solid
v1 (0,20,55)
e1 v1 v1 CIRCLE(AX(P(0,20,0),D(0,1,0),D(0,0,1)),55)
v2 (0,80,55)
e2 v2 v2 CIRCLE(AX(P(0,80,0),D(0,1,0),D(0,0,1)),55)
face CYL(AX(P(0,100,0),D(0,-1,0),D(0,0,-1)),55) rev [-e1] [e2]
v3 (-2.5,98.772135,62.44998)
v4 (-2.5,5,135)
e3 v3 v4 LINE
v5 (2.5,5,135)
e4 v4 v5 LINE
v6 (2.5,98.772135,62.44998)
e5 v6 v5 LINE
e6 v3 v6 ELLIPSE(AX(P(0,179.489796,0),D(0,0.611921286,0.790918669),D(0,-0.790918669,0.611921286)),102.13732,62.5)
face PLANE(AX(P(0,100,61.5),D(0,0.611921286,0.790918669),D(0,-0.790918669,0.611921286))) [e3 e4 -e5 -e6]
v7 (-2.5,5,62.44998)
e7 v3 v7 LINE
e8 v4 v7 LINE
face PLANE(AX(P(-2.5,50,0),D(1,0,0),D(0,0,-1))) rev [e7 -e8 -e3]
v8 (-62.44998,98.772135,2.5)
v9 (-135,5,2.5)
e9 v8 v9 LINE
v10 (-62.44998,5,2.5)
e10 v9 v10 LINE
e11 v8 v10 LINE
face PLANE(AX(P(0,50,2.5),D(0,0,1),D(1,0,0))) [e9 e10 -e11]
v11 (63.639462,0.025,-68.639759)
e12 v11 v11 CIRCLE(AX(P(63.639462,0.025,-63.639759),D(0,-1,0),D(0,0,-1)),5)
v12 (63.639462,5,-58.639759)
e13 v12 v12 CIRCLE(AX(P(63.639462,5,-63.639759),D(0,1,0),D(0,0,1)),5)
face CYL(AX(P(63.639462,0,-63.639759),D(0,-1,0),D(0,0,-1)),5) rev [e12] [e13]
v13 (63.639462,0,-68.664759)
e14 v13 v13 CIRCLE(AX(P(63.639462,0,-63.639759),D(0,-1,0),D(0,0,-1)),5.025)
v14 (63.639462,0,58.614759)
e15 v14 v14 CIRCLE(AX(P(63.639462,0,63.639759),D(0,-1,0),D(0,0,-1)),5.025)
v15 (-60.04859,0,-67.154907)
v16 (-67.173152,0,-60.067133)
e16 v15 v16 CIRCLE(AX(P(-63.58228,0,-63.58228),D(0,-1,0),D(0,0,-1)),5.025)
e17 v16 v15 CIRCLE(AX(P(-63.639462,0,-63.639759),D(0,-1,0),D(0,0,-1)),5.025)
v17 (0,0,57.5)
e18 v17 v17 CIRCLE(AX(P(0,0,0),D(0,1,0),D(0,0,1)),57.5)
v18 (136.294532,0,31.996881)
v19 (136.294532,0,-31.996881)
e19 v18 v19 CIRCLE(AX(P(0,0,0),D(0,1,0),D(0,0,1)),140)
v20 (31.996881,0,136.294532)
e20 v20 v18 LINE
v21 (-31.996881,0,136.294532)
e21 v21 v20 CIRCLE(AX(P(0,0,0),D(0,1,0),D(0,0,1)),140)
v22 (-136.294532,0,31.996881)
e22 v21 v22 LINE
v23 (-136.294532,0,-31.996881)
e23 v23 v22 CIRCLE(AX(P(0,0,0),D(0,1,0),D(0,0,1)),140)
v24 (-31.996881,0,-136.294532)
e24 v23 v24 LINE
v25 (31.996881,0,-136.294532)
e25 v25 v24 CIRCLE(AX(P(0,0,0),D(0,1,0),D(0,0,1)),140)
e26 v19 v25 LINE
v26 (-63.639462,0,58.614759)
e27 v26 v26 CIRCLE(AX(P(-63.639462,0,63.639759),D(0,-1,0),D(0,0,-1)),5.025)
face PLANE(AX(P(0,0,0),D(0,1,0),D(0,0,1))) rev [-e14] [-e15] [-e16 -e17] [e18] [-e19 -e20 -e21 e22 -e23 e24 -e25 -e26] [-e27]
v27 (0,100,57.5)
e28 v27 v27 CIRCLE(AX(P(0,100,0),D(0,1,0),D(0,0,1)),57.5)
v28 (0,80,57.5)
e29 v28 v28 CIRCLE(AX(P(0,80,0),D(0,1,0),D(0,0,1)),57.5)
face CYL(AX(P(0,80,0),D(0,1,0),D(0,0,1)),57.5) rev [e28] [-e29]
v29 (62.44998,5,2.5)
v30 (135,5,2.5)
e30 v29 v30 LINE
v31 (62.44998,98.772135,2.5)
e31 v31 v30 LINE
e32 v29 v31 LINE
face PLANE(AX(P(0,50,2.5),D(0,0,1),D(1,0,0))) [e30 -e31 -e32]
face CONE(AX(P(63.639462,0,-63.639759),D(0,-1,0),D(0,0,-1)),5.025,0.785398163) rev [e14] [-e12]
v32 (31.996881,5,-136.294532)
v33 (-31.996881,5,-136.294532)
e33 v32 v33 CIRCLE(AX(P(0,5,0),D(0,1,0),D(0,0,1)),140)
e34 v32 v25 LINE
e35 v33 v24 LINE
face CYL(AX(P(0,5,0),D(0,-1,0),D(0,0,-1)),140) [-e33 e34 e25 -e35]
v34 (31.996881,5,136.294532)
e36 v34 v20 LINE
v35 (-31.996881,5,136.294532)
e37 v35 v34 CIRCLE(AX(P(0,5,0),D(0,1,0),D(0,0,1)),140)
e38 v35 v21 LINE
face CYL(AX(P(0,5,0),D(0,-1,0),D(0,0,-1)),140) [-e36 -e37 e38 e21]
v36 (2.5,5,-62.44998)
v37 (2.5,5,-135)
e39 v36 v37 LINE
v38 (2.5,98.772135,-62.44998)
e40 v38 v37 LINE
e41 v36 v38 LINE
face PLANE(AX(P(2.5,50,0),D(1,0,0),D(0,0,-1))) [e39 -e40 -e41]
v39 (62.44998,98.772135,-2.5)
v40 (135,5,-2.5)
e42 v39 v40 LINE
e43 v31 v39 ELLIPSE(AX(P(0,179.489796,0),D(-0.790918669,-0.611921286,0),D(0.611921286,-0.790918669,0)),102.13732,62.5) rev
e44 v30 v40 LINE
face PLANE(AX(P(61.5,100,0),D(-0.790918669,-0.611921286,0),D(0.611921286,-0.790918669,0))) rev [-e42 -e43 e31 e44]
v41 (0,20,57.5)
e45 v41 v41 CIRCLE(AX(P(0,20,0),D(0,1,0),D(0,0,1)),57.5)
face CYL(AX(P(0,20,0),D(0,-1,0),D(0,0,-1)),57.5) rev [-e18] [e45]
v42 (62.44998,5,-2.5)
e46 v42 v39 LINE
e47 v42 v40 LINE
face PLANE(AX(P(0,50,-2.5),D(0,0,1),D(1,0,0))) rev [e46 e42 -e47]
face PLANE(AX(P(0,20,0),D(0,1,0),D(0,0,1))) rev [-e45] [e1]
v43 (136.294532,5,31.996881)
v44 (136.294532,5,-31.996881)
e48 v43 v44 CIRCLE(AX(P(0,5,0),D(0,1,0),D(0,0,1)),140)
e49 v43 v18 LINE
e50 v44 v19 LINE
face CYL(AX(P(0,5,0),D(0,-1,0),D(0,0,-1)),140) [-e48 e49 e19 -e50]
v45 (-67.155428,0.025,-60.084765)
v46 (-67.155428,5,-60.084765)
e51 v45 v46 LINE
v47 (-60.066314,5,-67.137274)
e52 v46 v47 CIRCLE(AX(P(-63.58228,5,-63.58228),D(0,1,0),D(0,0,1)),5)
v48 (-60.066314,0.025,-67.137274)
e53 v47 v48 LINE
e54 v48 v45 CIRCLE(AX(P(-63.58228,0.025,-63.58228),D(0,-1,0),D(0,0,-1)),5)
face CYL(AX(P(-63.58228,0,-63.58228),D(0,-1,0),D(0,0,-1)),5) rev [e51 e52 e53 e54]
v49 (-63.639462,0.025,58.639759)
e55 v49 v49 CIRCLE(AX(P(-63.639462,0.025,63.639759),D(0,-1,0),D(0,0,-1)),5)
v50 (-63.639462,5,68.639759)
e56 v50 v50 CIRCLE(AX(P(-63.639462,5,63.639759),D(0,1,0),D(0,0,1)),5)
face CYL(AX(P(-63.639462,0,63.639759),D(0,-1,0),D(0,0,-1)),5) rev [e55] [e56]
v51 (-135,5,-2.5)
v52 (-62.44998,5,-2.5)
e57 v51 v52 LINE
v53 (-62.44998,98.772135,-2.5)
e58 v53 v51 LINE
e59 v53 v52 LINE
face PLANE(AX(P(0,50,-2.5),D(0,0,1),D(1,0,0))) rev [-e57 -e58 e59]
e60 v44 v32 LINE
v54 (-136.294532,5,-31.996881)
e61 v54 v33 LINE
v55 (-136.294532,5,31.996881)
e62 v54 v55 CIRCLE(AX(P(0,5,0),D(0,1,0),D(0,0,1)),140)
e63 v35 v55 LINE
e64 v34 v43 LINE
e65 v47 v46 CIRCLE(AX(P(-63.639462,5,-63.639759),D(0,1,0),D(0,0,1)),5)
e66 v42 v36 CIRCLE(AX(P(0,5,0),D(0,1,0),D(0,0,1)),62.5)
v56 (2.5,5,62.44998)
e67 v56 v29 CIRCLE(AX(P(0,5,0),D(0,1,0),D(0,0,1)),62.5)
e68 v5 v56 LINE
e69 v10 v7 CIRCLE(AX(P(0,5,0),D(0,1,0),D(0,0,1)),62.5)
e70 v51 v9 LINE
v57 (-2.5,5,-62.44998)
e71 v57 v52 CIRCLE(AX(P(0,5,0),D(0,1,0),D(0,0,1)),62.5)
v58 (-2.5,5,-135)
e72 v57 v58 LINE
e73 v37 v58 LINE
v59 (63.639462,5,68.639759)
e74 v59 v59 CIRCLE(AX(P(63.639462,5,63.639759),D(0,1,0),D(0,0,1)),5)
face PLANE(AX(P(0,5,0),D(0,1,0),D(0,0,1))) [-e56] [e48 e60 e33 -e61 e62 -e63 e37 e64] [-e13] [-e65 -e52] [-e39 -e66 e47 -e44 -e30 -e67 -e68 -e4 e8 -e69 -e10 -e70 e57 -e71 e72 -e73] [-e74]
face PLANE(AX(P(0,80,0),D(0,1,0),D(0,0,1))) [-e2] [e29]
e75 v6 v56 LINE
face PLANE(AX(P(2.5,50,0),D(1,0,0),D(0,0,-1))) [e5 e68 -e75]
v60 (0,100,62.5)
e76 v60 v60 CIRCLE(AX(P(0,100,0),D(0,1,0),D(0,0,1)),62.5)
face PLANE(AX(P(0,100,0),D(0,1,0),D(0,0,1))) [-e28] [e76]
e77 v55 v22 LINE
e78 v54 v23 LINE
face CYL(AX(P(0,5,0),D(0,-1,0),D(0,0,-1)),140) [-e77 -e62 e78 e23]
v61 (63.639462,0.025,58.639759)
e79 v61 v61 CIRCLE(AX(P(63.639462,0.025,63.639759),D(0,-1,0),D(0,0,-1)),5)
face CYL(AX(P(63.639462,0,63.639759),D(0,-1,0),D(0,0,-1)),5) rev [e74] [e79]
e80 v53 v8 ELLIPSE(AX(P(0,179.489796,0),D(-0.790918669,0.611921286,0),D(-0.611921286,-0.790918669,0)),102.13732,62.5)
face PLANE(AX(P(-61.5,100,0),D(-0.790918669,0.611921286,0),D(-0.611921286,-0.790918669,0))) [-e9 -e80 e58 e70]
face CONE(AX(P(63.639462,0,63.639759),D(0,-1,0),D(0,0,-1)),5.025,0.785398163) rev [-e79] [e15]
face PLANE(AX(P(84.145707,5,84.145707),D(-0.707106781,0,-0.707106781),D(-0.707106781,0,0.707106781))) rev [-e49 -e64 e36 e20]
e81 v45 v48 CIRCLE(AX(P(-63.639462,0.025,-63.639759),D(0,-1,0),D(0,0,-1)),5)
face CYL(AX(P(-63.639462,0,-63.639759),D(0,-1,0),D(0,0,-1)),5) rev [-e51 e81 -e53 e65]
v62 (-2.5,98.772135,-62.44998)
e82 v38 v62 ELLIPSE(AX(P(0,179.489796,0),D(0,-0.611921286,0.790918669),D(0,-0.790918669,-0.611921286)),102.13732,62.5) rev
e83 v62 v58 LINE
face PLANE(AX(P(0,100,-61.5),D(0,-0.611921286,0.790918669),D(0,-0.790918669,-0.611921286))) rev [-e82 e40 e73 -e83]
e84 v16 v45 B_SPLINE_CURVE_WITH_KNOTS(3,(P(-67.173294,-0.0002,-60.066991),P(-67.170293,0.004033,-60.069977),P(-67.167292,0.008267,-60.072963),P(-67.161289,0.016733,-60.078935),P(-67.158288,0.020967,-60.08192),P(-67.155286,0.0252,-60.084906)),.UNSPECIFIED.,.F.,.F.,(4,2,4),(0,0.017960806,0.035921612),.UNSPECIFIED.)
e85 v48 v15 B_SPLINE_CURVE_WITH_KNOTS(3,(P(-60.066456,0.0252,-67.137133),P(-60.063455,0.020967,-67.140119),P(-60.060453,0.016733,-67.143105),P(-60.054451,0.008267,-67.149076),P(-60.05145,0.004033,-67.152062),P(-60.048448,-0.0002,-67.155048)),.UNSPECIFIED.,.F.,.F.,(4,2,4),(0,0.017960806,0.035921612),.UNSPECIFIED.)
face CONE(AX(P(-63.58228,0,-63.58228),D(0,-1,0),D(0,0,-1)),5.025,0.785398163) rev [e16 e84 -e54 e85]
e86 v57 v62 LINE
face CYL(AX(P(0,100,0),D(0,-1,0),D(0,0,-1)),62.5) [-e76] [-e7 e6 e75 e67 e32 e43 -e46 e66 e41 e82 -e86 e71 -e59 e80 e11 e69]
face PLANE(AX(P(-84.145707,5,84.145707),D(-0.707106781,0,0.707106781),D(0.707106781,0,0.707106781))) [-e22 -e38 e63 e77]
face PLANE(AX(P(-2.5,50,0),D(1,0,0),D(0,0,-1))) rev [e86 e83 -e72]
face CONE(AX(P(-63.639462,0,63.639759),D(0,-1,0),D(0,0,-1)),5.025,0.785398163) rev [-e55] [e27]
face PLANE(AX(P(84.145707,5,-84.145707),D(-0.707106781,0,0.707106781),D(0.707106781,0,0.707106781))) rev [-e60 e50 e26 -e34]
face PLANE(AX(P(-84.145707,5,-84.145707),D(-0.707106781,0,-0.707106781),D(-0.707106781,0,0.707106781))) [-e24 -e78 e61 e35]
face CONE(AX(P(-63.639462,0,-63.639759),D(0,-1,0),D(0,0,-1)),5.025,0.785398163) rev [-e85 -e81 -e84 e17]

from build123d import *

# Parameters (mm, degrees)
SKETCH1_R                        = 140
SKETCH1_R_2                      = 62.5
BOSS_EXTRUDE1_DEPTH              = 5
SKETCH1_3_R                      = 62.5
SKETCH1_3_R_2                    = 57.5
SKETCH1_3_R_3                    = 55
BOSS_EXTRUDE2_DEPTH              = 100
SKETCH1_4_R                      = 57.5
SKETCH1_4_R_2                    = 55
CUT_EXTRUDE1_DEPTH               = 20
CUT_EXTRUDE2_START               = -20
SKETCH2_R                        = 57.5
CUT_EXTRUDE2_DEPTH               = 20
F_10_0MM_DOWEL_HOLE1_D           = 10
F_10_0MM_DOWEL_HOLE1_CSINK_D     = 10.05
F_10_0MM_DOWEL_HOLE1_CSINK_ANGLE = 90
CUT_EXTRUDE3_DEPTH               = 5
RIB4_START                       = -2.5
RIB4_DEPTH                       = 5
RIB5_REACH                       = 223.811
SKETCH9_WALL_W                   = 565.734948258
SKETCH9_WALL_H                   = 5
RIB6_REACH                       = 223.811
SKETCH10_WALL_W                  = 565.734948258
SKETCH10_WALL_H                  = 5
RIB7_REACH                       = 223.811
SKETCH11_WALL_W                  = 565.734948258
SKETCH11_WALL_H                  = 5


# Read off the part's stored shape, not the designer's step: Rib4
with BuildPart() as part:
    # Sketch1 → Boss-Extrude1 (new body)
    with BuildSketch(Plane(origin=(0, 0, 0), x_dir=(1, 0, 0), z_dir=(0, 1, 0))):
        with Locations(Location((0, 0, 0), (0, 0, 270))):
            Circle(SKETCH1_R)
        with Locations(Location((0, 0, 0), (0, 0, 270))):
            Circle(SKETCH1_R_2, mode=Mode.SUBTRACT)
    extrude(amount=BOSS_EXTRUDE1_DEPTH)

    # Sketch1<3> → Boss-Extrude2 (add)
    # profile 1 of 2: a face of its own
    with BuildSketch(Plane(origin=(0, 0, 0), x_dir=(1, 0, 0), z_dir=(0, 1, 0))):
        with Locations(Location((0, 0, 0), (0, 0, 270))):
            Circle(SKETCH1_3_R)
        Circle(SKETCH1_3_R_2, mode=Mode.SUBTRACT)
    # profile 2 of 2: a face of its own
    with BuildSketch(Plane(origin=(0, 0, 0), x_dir=(1, 0, 0), z_dir=(0, 1, 0))):
        Circle(SKETCH1_3_R_2)
        with Locations(Location((0, 0, 0), (0, 0, 270))):
            Circle(SKETCH1_3_R_3, mode=Mode.SUBTRACT)
    extrude(amount=BOSS_EXTRUDE2_DEPTH)

    # Sketch1<4> → Cut-Extrude1 (cut)
    with BuildSketch(Plane(origin=(0, 0, 0), x_dir=(1, 0, 0), z_dir=(0, 1, 0))):
        with Locations(Location((0, 0, 0), (0, 0, 270))):
            Circle(SKETCH1_4_R)
        with Locations(Location((0, 0, 0), (0, 0, 270))):
            Circle(SKETCH1_4_R_2, mode=Mode.SUBTRACT)
    extrude(amount=CUT_EXTRUDE1_DEPTH, mode=Mode.SUBTRACT)

    # Sketch2 → Cut-Extrude2 (cut)
    with BuildSketch(Plane(origin=(0, 100, 0), x_dir=(1, 0, 0), z_dir=(0, 1, 0)).offset(CUT_EXTRUDE2_START)):
        with Locations(Location((0, 0, 0), (0, 0, 270))):
            Circle(SKETCH2_R)
    extrude(amount=CUT_EXTRUDE2_DEPTH, mode=Mode.SUBTRACT)

    # Ø10.0mm Dowel Hole1 (through all)
    with Locations(Plane.XZ):
        with Locations((-63.639461911, -63.639758703), (63.639461911, -63.639758703), (63.639461911, 63.639758703), (-63.639461911, 63.639758703), (-63.582280459, -63.582280459)):
            CounterSinkHole(F_10_0MM_DOWEL_HOLE1_D / 2, F_10_0MM_DOWEL_HOLE1_CSINK_D / 2, counter_sink_angle=F_10_0MM_DOWEL_HOLE1_CSINK_ANGLE)

    # Sketch8 → Cut-Extrude3 (cut)
    with BuildSketch(Plane(origin=(0, 0, 0), x_dir=(1, 0, 0), z_dir=(0, 1, 0))):
        with BuildLine():
            ThreePointArc((31.996881471, 136.294532451), (136.294532451, 136.294532451), (136.294532451, 31.996881471))
            Line((136.294532451, 31.996881471), (31.996881471, 136.294532451))
        make_face()
        with BuildLine():
            Line((31.996881471, -136.294532451), (136.294532451, -31.996881471))
            ThreePointArc((136.294532451, -31.996881471), (136.294532451, -136.294532451), (31.996881471, -136.294532451))
        make_face()
        with BuildLine():
            Line((-31.996881471, -136.294532451), (-84.145706961, -84.145706961))
            Line((-84.145706961, -84.145706961), (-136.294532451, -31.996881471))
            ThreePointArc((-136.294532451, -31.996881471), (-136.294532451, -136.294532451), (-31.996881471, -136.294532451))
        make_face()
        with BuildLine():
            Line((-136.294532451, 31.996881471), (-31.996881471, 136.294532451))
            ThreePointArc((-31.996881471, 136.294532451), (-136.294532451, 136.294532451), (-136.294532451, 31.996881471))
        make_face()
    extrude(amount=CUT_EXTRUDE3_DEPTH, mode=Mode.SUBTRACT)

    # Rib4 outline → Rib4 (add)
    with BuildSketch(Plane.XY.offset(RIB4_START)):
        Polygon((-61.5, 100), (-62.449979984, 98.772134715), (-135, 5), (-61, 5), (-61, 100), align=None)
    extrude(amount=RIB4_DEPTH)

    # Sketch9 wall → Rib5 (add, up to next)
    with BuildSketch(Plane(origin=(98.25, 52.5, 0), x_dir=(0.611921285633, -0.790918668505, 0), z_dir=(0.790918668505, 0.611921285633, 0)), mode=Mode.PRIVATE) as rib5_sk1:
        Rectangle(SKETCH9_WALL_W, SKETCH9_WALL_H)
    rib5_tool1 = extrude(rib5_sk1.sketch, amount=-RIB5_REACH, mode=Mode.PRIVATE) - part.part
    add(rib5_tool1.solids().sort_by_distance((98.25, 52.5, 0))[0])

    # Sketch10 wall → Rib6 (add, up to next)
    with BuildSketch(Plane(origin=(0, 52.5, 98.25), x_dir=(0, -0.790918668505, 0.611921285633), z_dir=(0, -0.611921285633, -0.790918668505)), mode=Mode.PRIVATE) as rib6_sk1:
        Rectangle(SKETCH10_WALL_W, SKETCH10_WALL_H)
    rib6_tool1 = extrude(rib6_sk1.sketch, amount=RIB6_REACH, mode=Mode.PRIVATE) - part.part
    add(rib6_tool1.solids().sort_by_distance((0, 52.5, 98.25))[0])

    # Sketch11 wall → Rib7 (add, up to next)
    with BuildSketch(Plane(origin=(0, 52.5, -98.25), x_dir=(0, -0.790918668505, -0.611921285633), z_dir=(0, 0.611921285633, -0.790918668505)), mode=Mode.PRIVATE) as rib7_sk1:
        Rectangle(SKETCH11_WALL_W, SKETCH11_WALL_H)
    rib7_tool1 = extrude(rib7_sk1.sketch, amount=-RIB7_REACH, mode=Mode.PRIVATE) - part.part
    add(rib7_tool1.solids().sort_by_distance((0, 52.5, -98.25))[0])


solid = part.part
